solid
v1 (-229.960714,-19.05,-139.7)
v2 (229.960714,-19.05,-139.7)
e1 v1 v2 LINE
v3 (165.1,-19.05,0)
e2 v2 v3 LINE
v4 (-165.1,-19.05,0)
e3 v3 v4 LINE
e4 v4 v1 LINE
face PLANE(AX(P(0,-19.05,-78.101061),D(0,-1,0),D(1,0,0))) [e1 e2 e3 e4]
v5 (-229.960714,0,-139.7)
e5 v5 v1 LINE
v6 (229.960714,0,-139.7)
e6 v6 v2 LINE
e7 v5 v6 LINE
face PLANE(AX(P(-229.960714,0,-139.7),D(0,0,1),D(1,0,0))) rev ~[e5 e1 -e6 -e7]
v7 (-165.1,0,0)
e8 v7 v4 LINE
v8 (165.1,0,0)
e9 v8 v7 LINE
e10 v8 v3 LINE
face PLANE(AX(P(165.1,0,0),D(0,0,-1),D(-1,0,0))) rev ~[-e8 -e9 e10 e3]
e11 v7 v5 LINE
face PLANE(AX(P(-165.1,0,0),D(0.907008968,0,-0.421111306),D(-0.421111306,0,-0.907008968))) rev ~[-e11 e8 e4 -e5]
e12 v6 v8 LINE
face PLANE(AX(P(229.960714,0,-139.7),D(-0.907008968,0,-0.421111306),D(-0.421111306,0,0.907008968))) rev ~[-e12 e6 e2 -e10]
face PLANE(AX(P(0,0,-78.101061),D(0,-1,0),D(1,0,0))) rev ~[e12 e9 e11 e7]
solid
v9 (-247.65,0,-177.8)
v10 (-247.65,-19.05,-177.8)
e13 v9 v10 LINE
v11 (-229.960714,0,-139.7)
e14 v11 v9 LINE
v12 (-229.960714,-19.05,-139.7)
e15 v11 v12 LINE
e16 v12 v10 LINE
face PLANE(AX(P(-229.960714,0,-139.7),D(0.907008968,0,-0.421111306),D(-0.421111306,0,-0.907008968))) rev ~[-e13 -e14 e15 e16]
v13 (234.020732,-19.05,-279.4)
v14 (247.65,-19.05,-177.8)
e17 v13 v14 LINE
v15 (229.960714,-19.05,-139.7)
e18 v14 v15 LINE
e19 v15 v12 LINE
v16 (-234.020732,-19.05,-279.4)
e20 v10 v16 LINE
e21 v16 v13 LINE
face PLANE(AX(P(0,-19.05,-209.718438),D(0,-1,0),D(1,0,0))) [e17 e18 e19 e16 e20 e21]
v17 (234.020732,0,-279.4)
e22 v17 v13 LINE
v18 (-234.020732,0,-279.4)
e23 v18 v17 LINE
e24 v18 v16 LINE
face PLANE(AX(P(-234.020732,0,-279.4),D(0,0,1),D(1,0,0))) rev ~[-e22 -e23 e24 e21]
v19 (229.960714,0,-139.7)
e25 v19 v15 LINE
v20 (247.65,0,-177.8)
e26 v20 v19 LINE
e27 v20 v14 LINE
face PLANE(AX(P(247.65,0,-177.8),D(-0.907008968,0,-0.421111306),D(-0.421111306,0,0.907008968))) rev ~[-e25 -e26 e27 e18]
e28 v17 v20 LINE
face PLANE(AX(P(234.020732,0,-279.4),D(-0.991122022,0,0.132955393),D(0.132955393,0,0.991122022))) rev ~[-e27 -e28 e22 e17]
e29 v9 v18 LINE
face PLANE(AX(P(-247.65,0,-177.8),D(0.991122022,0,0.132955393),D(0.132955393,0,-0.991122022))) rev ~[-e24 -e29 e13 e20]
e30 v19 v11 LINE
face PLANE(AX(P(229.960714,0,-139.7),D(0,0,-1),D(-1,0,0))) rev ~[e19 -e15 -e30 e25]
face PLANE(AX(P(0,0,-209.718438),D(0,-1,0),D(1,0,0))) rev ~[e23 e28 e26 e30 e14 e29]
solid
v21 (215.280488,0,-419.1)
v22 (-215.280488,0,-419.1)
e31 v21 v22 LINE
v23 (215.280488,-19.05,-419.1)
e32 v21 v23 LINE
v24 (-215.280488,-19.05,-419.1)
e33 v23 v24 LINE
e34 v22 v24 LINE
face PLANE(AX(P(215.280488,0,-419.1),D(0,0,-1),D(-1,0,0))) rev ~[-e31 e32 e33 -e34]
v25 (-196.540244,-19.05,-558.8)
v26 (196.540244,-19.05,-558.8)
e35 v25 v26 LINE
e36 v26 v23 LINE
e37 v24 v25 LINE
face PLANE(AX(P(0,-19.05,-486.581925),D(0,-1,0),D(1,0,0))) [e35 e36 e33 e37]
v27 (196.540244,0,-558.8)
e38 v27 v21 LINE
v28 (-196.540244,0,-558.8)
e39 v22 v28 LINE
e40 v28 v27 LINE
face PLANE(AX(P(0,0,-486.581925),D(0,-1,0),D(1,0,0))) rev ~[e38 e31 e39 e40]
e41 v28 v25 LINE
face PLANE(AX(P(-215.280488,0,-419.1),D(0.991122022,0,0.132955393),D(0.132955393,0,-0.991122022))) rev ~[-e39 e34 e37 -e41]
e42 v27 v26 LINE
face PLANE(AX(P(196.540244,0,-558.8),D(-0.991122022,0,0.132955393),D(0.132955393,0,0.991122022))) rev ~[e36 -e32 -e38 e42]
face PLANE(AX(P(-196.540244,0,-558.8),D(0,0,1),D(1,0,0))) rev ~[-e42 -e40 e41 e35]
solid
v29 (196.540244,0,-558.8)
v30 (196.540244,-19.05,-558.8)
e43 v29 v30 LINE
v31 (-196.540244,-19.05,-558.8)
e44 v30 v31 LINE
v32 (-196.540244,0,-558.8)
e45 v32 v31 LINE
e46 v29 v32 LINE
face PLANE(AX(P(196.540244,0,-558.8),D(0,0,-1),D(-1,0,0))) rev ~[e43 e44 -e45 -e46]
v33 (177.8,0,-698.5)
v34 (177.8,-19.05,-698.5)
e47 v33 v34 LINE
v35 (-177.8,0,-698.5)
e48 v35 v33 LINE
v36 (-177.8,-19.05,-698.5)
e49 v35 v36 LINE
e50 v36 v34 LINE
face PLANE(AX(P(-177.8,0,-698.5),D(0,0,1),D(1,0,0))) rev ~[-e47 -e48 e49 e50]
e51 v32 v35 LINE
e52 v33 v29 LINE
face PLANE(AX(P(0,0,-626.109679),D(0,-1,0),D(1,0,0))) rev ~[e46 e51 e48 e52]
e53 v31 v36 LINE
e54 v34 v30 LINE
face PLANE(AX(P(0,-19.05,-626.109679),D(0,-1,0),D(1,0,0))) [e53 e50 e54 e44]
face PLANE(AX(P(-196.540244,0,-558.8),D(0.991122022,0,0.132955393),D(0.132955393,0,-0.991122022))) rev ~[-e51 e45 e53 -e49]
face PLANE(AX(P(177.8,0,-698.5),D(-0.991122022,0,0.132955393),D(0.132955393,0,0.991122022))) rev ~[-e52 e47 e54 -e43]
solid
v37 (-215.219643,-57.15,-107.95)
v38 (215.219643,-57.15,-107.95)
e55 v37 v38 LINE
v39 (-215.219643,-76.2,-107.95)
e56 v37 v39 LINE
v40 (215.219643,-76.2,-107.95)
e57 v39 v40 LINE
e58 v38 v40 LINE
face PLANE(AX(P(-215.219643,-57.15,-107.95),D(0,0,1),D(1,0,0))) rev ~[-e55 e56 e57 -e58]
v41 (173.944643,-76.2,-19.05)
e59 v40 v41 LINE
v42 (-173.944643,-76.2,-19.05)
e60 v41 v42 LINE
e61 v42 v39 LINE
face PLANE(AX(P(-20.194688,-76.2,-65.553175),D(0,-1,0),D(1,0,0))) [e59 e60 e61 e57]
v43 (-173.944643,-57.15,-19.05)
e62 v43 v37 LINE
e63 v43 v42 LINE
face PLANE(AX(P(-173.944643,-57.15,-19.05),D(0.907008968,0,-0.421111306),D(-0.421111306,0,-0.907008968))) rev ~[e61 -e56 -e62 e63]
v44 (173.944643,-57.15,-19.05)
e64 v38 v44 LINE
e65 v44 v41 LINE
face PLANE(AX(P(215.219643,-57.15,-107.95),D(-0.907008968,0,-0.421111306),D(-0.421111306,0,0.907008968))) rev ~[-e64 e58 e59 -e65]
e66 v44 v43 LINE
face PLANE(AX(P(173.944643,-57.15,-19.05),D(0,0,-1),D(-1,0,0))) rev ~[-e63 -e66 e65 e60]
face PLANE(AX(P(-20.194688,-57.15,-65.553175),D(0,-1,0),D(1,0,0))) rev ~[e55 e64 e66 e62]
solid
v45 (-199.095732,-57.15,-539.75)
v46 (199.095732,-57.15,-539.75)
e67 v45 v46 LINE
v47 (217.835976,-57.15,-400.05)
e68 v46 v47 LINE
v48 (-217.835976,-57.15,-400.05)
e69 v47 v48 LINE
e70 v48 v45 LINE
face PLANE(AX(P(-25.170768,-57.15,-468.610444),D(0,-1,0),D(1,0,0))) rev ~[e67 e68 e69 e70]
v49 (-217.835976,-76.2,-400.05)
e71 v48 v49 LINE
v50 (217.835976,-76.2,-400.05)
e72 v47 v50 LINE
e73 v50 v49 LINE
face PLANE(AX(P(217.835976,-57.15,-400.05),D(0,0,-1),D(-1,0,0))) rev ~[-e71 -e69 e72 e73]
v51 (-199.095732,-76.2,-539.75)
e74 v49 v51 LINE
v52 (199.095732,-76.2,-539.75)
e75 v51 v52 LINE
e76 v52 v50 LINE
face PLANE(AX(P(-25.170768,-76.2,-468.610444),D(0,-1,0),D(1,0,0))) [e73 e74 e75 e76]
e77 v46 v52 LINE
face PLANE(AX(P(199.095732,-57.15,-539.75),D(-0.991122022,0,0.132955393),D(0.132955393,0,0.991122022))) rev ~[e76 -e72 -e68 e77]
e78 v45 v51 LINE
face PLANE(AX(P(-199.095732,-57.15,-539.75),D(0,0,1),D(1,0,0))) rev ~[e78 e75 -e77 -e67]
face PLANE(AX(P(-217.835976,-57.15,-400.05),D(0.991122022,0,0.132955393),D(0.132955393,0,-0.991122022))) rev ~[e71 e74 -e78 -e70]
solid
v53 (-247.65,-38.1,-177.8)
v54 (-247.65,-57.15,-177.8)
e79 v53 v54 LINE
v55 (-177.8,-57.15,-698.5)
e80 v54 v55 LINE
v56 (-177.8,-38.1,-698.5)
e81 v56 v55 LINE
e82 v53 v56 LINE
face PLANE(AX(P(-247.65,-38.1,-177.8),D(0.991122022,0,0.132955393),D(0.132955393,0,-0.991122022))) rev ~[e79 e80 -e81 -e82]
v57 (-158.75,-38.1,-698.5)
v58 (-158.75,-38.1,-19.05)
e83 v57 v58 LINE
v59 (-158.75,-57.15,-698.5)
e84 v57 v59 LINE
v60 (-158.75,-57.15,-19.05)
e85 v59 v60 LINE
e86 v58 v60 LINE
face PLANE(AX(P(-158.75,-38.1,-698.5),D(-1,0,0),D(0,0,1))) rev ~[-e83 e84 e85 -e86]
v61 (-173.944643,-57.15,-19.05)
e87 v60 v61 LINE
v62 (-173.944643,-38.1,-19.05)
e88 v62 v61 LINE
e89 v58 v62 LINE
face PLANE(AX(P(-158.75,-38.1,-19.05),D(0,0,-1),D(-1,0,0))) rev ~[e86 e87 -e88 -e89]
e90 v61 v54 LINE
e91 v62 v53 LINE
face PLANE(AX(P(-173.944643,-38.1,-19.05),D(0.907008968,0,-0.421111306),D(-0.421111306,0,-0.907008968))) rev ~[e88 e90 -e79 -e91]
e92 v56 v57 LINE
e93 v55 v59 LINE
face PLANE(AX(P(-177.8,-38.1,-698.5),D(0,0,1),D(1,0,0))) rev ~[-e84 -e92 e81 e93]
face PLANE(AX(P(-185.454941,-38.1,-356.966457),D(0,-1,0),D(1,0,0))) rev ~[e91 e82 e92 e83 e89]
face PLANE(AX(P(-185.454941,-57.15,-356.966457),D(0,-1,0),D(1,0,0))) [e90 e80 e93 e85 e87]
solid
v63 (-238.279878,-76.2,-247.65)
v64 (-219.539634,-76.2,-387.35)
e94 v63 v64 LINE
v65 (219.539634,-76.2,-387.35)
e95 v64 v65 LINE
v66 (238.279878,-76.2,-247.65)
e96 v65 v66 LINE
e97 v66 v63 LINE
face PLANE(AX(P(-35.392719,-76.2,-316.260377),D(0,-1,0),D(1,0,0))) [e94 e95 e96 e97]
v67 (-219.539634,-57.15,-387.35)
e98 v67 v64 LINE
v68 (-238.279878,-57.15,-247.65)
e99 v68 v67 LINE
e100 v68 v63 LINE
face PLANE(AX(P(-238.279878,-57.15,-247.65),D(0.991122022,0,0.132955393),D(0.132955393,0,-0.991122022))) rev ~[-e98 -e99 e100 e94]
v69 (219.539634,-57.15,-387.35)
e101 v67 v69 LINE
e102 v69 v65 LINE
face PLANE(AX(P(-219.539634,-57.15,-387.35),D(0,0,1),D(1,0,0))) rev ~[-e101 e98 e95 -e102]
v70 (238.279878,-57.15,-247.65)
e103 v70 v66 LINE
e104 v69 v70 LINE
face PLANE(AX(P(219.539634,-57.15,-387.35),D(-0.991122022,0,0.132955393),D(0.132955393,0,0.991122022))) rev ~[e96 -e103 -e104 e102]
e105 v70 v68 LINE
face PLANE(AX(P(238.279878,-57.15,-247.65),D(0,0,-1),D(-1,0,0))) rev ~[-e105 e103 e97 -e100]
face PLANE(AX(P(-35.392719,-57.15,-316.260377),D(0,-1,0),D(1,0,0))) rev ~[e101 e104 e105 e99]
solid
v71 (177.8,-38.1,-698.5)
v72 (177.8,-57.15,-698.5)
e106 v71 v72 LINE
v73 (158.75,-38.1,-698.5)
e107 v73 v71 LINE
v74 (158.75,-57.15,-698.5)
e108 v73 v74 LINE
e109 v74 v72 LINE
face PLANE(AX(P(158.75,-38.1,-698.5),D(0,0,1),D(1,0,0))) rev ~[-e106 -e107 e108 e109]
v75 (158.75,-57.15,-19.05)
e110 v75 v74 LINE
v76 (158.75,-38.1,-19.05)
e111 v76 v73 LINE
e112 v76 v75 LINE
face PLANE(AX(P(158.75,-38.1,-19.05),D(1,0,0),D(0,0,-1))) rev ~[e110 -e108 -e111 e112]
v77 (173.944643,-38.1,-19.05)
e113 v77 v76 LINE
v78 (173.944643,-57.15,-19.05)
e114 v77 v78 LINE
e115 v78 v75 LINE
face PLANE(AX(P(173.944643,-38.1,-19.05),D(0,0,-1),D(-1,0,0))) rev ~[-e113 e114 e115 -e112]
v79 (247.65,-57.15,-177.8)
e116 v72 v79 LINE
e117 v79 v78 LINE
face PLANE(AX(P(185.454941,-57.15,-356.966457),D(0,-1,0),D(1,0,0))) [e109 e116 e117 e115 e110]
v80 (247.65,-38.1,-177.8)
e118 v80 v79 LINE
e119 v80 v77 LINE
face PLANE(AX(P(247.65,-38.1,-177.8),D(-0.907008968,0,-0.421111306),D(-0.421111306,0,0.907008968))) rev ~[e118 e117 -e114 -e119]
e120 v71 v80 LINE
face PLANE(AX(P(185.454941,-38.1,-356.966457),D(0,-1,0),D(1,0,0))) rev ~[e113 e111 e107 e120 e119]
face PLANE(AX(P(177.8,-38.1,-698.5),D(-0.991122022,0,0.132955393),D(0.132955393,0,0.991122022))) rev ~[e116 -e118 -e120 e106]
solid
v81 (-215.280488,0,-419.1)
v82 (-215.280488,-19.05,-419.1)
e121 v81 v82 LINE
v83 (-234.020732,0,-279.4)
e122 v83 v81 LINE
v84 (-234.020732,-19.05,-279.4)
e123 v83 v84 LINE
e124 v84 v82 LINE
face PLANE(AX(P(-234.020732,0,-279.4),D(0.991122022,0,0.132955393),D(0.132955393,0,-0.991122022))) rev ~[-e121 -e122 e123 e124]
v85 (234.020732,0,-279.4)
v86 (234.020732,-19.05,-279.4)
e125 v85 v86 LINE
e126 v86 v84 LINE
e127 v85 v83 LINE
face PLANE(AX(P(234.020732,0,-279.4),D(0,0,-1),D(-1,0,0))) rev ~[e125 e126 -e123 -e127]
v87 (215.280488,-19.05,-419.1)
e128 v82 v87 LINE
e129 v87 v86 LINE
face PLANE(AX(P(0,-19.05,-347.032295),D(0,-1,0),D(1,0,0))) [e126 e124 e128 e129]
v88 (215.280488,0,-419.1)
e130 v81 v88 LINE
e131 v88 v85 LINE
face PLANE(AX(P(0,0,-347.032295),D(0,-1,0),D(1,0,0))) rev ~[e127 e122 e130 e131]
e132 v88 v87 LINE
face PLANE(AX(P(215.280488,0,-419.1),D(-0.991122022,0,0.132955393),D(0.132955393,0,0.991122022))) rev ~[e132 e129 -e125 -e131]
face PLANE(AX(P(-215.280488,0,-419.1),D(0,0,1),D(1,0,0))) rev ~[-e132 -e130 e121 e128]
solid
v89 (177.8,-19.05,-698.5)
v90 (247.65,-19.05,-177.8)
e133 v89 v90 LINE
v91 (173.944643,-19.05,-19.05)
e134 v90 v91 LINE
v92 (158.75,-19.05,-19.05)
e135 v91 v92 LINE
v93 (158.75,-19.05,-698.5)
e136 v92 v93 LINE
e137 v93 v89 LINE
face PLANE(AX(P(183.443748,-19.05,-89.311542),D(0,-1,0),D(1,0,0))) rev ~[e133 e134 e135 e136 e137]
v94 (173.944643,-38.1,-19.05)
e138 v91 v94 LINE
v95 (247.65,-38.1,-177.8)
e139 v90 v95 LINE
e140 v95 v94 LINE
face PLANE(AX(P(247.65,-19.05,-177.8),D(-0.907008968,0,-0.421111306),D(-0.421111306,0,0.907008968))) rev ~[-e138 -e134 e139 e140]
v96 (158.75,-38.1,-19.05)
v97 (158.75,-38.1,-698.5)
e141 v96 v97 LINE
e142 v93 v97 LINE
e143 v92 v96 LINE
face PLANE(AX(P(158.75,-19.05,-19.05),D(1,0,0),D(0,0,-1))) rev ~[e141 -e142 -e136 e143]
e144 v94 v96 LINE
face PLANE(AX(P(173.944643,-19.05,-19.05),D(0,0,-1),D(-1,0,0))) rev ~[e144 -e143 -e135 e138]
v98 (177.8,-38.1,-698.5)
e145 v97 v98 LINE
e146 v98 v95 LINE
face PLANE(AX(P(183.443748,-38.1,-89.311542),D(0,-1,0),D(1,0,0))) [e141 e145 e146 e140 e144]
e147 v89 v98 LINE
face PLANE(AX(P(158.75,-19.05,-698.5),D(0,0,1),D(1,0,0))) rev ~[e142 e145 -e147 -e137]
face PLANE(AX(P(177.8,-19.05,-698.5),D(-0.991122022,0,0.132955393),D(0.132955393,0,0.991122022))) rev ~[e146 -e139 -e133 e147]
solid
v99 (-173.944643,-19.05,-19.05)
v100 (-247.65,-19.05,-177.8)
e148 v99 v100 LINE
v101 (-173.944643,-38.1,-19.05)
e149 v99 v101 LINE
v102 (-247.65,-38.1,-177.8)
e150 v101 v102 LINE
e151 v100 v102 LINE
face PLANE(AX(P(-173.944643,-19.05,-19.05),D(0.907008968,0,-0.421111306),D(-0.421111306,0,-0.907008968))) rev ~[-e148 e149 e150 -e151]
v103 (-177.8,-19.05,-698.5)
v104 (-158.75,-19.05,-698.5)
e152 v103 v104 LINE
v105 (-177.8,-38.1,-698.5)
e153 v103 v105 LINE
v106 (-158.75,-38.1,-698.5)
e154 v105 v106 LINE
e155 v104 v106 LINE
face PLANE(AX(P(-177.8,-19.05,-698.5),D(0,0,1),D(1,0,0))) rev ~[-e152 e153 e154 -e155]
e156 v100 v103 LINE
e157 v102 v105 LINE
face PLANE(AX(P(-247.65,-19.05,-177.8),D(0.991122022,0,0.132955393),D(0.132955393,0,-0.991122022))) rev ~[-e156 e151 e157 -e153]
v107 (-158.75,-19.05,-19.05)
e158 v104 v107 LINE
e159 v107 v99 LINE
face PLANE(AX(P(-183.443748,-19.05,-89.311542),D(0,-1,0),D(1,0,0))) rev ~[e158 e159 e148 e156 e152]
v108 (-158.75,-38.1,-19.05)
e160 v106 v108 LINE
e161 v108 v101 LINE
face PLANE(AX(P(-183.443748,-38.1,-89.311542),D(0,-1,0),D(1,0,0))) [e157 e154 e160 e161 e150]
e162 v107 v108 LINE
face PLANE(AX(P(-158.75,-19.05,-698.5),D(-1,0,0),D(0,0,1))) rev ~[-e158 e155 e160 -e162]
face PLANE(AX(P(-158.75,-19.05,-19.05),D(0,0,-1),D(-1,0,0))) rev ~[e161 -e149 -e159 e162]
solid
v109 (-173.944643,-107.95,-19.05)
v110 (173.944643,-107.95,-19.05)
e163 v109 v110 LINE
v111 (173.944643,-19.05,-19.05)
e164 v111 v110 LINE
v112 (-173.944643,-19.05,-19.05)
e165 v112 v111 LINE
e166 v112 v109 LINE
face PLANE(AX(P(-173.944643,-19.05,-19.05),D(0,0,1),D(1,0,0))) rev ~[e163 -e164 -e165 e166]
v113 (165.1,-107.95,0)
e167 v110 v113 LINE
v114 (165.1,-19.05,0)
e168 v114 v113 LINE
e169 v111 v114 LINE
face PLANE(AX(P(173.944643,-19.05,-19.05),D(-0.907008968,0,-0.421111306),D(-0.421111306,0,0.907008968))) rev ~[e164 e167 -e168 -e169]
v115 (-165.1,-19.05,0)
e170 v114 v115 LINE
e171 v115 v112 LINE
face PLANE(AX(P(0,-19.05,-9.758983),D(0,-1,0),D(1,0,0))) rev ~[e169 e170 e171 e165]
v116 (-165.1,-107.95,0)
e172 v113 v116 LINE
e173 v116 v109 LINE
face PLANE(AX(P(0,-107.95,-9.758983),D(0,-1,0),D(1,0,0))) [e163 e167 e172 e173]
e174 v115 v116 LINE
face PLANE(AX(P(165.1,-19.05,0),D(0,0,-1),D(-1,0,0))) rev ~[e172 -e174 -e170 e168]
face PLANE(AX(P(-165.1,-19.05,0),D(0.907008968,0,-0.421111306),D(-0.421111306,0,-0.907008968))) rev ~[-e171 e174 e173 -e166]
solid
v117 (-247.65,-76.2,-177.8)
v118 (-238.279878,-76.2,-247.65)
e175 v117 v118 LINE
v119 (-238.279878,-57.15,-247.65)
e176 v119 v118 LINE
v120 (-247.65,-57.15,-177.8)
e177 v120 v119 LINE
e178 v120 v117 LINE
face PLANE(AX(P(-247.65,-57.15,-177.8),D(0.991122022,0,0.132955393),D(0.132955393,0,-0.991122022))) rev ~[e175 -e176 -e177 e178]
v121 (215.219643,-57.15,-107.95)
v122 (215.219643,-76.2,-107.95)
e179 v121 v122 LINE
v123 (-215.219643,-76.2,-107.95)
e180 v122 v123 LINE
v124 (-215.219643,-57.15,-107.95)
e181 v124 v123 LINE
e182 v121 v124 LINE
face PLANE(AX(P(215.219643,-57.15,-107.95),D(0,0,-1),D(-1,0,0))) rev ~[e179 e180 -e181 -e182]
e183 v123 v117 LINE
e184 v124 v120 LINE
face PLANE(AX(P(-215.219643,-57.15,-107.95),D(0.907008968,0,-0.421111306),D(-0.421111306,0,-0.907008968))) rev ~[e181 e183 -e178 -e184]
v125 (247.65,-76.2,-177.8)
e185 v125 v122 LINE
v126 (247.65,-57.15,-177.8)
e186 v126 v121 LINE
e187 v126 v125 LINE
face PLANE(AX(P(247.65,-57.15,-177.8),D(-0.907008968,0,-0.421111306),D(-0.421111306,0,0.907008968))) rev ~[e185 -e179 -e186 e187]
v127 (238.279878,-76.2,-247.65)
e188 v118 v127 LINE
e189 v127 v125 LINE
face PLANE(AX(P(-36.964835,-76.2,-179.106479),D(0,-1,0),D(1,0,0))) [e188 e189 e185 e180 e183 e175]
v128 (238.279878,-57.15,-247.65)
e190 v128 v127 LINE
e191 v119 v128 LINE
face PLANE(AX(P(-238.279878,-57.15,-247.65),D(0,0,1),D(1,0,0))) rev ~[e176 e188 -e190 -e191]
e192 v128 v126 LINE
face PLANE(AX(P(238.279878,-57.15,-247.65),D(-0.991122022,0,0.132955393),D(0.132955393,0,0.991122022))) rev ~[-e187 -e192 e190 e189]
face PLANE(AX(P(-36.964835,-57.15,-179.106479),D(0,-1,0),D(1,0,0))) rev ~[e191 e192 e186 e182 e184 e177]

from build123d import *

# Parameters (mm, degrees)
F2_DEPTH  = 19.05
F3_DEPTH  = 19.05
F5_DEPTH  = 19.05
F7_DEPTH  = 19.05
F8_DEPTH  = 88.9
F10_DEPTH = 19.05
F11_DEPTH = 19.05


# Not quite as in the source:
# - a feature names something its author has since deleted; it is built from what else it names


with BuildPart() as f2:
    # F1 (on Front) → F2 (new body)
    with BuildSketch(Plane.XZ):
        Polygon((-215.2804878049, -419.1), (-196.5402439024, -558.8), (196.5402439024, -558.8), (215.2804878049, -419.1), align=None)
    extrude(amount=F2_DEPTH)


with BuildPart() as f2b:
    # F1 (on Front) → F2, piece 2 (new body)
    with BuildSketch(Plane.XZ):
        Polygon((-247.65, -177.8), (-234.0207317073, -279.4), (234.0207317073, -279.4), (247.65, -177.8), (229.9607142857, -139.7), (-229.9607142857, -139.7), align=None)
    extrude(amount=F2_DEPTH)


with BuildPart() as f3:
    # F1 (on Front) → F3 (new body)
    with BuildSketch(Plane.XZ):
        Polygon((-196.5402439024, -558.8), (-177.8, -698.5), (177.8, -698.5), (196.5402439024, -558.8), align=None)
    extrude(amount=F3_DEPTH)


with BuildPart() as f3b:
    # F1 (on Front) → F3, piece 2 (new body)
    with BuildSketch(Plane.XZ):
        Polygon((-234.0207317073, -279.4), (-215.2804878049, -419.1), (215.2804878049, -419.1), (234.0207317073, -279.4), align=None)
    extrude(amount=F3_DEPTH)


with BuildPart() as f3c:
    # F1 (on Front) → F3, piece 3 (new body)
    with BuildSketch(Plane.XZ):
        Polygon((-165.1, 0), (-229.9607142857, -139.7), (229.9607142857, -139.7), (165.1, 0), align=None)
    extrude(amount=F3_DEPTH)


with BuildPart() as f5:
    # F4 (on face) → F5 (new body)
    with BuildSketch(Plane.XZ.offset(19.05)):
        Polygon((-173.9446428571, -19.05), (-229.9607142857, -139.7), (-158.75, -139.7), (-158.75, -19.05), align=None)
        Polygon((-247.65, -177.8), (-177.8, -698.5), (-158.75, -698.5), (-158.75, -139.7), (-229.9607142857, -139.7), align=None)
    extrude(amount=F5_DEPTH)


with BuildPart() as f5b:
    # F4 (on face) → F5, piece 2 (new body)
    with BuildSketch(Plane.XZ.offset(19.05)):
        Polygon((158.75, -19.05), (158.75, -139.7), (229.9607142857, -139.7), (173.9446428571, -19.05), align=None)
        Polygon((229.9607142857, -139.7), (158.75, -139.7), (158.75, -698.5), (177.8, -698.5), (247.65, -177.8), align=None)
    extrude(amount=F5_DEPTH)


with BuildPart() as f7:
    # F6 (on face) → F7 (new body)
    with BuildSketch(Plane.XZ.offset(38.1)):
        Polygon((-247.65, -177.8), (-177.8, -698.5), (-158.75, -698.5), (-158.75, -19.05), (-173.9446428571, -19.05), align=None)
    extrude(amount=F7_DEPTH)


with BuildPart() as f7b:
    # F6 (on face) → F7, piece 2 (new body)
    with BuildSketch(Plane.XZ.offset(38.1)):
        Polygon((173.9446428571, -19.05), (158.75, -19.05), (158.75, -698.5), (177.8, -698.5), (247.65, -177.8), align=None)
    extrude(amount=F7_DEPTH)


with BuildPart() as f8:
    # F4 (on face) → F8 (new body)
    with BuildSketch(Plane.XZ.offset(19.05)):
        Polygon((-165.1, 0), (-173.9446428571, -19.05), (-158.75, -19.05), (158.75, -19.05), (173.9446428571, -19.05), (165.1, 0), align=None)
    extrude(amount=F8_DEPTH)


with BuildPart() as f10:
    # F9 (on face) → F10 (new body)
    with BuildSketch(Plane.XZ.offset(57.15)):
        Polygon((158.75, -107.95), (-215.2196428571, -107.95), (-247.65, -177.8), (-238.2798780488, -247.65), (158.75, -247.65), align=None)
        Polygon((215.2196428571, -107.95), (158.75, -107.95), (158.75, -247.65), (238.2798780488, -247.65), (247.65, -177.8), align=None)
    extrude(amount=F10_DEPTH)


with BuildPart() as f10b:
    # F9 (on face) → F10, piece 2 (new body)
    with BuildSketch(Plane.XZ.offset(57.15)):
        Polygon((158.75, -539.75), (158.75, -400.05), (-217.8359756098, -400.05), (-199.0957317073, -539.75), align=None)
        Polygon((217.8359756098, -400.05), (158.75, -400.05), (158.75, -539.75), (199.0957317073, -539.75), align=None)
    extrude(amount=F10_DEPTH)


with BuildPart() as f11:
    # F9 (on face) → F11 (new body)
    with BuildSketch(Plane.XZ.offset(57.15)):
        Polygon((158.75, -387.35), (158.75, -247.65), (-238.2798780488, -247.65), (-219.5396341463, -387.35), align=None)
        Polygon((238.2798780488, -247.65), (158.75, -247.65), (158.75, -387.35), (219.5396341463, -387.35), align=None)
    extrude(amount=F11_DEPTH)


with BuildPart() as f11b:
    # F9 (on face) → F11, piece 2 (new body)
    with BuildSketch(Plane.XZ.offset(57.15)):
        Polygon((158.75, -19.05), (-173.9446428571, -19.05), (-215.2196428571, -107.95), (158.75, -107.95), align=None)
        Polygon((173.9446428571, -19.05), (158.75, -19.05), (158.75, -107.95), (215.2196428571, -107.95), align=None)
    extrude(amount=F11_DEPTH)


solid = Compound([f2.part, f2b.part, f3.part, f3b.part, f3c.part, f5.part, f5b.part, f7.part, f7b.part, f8.part, f10.part, f10b.part, f11.part, f11b.part])
